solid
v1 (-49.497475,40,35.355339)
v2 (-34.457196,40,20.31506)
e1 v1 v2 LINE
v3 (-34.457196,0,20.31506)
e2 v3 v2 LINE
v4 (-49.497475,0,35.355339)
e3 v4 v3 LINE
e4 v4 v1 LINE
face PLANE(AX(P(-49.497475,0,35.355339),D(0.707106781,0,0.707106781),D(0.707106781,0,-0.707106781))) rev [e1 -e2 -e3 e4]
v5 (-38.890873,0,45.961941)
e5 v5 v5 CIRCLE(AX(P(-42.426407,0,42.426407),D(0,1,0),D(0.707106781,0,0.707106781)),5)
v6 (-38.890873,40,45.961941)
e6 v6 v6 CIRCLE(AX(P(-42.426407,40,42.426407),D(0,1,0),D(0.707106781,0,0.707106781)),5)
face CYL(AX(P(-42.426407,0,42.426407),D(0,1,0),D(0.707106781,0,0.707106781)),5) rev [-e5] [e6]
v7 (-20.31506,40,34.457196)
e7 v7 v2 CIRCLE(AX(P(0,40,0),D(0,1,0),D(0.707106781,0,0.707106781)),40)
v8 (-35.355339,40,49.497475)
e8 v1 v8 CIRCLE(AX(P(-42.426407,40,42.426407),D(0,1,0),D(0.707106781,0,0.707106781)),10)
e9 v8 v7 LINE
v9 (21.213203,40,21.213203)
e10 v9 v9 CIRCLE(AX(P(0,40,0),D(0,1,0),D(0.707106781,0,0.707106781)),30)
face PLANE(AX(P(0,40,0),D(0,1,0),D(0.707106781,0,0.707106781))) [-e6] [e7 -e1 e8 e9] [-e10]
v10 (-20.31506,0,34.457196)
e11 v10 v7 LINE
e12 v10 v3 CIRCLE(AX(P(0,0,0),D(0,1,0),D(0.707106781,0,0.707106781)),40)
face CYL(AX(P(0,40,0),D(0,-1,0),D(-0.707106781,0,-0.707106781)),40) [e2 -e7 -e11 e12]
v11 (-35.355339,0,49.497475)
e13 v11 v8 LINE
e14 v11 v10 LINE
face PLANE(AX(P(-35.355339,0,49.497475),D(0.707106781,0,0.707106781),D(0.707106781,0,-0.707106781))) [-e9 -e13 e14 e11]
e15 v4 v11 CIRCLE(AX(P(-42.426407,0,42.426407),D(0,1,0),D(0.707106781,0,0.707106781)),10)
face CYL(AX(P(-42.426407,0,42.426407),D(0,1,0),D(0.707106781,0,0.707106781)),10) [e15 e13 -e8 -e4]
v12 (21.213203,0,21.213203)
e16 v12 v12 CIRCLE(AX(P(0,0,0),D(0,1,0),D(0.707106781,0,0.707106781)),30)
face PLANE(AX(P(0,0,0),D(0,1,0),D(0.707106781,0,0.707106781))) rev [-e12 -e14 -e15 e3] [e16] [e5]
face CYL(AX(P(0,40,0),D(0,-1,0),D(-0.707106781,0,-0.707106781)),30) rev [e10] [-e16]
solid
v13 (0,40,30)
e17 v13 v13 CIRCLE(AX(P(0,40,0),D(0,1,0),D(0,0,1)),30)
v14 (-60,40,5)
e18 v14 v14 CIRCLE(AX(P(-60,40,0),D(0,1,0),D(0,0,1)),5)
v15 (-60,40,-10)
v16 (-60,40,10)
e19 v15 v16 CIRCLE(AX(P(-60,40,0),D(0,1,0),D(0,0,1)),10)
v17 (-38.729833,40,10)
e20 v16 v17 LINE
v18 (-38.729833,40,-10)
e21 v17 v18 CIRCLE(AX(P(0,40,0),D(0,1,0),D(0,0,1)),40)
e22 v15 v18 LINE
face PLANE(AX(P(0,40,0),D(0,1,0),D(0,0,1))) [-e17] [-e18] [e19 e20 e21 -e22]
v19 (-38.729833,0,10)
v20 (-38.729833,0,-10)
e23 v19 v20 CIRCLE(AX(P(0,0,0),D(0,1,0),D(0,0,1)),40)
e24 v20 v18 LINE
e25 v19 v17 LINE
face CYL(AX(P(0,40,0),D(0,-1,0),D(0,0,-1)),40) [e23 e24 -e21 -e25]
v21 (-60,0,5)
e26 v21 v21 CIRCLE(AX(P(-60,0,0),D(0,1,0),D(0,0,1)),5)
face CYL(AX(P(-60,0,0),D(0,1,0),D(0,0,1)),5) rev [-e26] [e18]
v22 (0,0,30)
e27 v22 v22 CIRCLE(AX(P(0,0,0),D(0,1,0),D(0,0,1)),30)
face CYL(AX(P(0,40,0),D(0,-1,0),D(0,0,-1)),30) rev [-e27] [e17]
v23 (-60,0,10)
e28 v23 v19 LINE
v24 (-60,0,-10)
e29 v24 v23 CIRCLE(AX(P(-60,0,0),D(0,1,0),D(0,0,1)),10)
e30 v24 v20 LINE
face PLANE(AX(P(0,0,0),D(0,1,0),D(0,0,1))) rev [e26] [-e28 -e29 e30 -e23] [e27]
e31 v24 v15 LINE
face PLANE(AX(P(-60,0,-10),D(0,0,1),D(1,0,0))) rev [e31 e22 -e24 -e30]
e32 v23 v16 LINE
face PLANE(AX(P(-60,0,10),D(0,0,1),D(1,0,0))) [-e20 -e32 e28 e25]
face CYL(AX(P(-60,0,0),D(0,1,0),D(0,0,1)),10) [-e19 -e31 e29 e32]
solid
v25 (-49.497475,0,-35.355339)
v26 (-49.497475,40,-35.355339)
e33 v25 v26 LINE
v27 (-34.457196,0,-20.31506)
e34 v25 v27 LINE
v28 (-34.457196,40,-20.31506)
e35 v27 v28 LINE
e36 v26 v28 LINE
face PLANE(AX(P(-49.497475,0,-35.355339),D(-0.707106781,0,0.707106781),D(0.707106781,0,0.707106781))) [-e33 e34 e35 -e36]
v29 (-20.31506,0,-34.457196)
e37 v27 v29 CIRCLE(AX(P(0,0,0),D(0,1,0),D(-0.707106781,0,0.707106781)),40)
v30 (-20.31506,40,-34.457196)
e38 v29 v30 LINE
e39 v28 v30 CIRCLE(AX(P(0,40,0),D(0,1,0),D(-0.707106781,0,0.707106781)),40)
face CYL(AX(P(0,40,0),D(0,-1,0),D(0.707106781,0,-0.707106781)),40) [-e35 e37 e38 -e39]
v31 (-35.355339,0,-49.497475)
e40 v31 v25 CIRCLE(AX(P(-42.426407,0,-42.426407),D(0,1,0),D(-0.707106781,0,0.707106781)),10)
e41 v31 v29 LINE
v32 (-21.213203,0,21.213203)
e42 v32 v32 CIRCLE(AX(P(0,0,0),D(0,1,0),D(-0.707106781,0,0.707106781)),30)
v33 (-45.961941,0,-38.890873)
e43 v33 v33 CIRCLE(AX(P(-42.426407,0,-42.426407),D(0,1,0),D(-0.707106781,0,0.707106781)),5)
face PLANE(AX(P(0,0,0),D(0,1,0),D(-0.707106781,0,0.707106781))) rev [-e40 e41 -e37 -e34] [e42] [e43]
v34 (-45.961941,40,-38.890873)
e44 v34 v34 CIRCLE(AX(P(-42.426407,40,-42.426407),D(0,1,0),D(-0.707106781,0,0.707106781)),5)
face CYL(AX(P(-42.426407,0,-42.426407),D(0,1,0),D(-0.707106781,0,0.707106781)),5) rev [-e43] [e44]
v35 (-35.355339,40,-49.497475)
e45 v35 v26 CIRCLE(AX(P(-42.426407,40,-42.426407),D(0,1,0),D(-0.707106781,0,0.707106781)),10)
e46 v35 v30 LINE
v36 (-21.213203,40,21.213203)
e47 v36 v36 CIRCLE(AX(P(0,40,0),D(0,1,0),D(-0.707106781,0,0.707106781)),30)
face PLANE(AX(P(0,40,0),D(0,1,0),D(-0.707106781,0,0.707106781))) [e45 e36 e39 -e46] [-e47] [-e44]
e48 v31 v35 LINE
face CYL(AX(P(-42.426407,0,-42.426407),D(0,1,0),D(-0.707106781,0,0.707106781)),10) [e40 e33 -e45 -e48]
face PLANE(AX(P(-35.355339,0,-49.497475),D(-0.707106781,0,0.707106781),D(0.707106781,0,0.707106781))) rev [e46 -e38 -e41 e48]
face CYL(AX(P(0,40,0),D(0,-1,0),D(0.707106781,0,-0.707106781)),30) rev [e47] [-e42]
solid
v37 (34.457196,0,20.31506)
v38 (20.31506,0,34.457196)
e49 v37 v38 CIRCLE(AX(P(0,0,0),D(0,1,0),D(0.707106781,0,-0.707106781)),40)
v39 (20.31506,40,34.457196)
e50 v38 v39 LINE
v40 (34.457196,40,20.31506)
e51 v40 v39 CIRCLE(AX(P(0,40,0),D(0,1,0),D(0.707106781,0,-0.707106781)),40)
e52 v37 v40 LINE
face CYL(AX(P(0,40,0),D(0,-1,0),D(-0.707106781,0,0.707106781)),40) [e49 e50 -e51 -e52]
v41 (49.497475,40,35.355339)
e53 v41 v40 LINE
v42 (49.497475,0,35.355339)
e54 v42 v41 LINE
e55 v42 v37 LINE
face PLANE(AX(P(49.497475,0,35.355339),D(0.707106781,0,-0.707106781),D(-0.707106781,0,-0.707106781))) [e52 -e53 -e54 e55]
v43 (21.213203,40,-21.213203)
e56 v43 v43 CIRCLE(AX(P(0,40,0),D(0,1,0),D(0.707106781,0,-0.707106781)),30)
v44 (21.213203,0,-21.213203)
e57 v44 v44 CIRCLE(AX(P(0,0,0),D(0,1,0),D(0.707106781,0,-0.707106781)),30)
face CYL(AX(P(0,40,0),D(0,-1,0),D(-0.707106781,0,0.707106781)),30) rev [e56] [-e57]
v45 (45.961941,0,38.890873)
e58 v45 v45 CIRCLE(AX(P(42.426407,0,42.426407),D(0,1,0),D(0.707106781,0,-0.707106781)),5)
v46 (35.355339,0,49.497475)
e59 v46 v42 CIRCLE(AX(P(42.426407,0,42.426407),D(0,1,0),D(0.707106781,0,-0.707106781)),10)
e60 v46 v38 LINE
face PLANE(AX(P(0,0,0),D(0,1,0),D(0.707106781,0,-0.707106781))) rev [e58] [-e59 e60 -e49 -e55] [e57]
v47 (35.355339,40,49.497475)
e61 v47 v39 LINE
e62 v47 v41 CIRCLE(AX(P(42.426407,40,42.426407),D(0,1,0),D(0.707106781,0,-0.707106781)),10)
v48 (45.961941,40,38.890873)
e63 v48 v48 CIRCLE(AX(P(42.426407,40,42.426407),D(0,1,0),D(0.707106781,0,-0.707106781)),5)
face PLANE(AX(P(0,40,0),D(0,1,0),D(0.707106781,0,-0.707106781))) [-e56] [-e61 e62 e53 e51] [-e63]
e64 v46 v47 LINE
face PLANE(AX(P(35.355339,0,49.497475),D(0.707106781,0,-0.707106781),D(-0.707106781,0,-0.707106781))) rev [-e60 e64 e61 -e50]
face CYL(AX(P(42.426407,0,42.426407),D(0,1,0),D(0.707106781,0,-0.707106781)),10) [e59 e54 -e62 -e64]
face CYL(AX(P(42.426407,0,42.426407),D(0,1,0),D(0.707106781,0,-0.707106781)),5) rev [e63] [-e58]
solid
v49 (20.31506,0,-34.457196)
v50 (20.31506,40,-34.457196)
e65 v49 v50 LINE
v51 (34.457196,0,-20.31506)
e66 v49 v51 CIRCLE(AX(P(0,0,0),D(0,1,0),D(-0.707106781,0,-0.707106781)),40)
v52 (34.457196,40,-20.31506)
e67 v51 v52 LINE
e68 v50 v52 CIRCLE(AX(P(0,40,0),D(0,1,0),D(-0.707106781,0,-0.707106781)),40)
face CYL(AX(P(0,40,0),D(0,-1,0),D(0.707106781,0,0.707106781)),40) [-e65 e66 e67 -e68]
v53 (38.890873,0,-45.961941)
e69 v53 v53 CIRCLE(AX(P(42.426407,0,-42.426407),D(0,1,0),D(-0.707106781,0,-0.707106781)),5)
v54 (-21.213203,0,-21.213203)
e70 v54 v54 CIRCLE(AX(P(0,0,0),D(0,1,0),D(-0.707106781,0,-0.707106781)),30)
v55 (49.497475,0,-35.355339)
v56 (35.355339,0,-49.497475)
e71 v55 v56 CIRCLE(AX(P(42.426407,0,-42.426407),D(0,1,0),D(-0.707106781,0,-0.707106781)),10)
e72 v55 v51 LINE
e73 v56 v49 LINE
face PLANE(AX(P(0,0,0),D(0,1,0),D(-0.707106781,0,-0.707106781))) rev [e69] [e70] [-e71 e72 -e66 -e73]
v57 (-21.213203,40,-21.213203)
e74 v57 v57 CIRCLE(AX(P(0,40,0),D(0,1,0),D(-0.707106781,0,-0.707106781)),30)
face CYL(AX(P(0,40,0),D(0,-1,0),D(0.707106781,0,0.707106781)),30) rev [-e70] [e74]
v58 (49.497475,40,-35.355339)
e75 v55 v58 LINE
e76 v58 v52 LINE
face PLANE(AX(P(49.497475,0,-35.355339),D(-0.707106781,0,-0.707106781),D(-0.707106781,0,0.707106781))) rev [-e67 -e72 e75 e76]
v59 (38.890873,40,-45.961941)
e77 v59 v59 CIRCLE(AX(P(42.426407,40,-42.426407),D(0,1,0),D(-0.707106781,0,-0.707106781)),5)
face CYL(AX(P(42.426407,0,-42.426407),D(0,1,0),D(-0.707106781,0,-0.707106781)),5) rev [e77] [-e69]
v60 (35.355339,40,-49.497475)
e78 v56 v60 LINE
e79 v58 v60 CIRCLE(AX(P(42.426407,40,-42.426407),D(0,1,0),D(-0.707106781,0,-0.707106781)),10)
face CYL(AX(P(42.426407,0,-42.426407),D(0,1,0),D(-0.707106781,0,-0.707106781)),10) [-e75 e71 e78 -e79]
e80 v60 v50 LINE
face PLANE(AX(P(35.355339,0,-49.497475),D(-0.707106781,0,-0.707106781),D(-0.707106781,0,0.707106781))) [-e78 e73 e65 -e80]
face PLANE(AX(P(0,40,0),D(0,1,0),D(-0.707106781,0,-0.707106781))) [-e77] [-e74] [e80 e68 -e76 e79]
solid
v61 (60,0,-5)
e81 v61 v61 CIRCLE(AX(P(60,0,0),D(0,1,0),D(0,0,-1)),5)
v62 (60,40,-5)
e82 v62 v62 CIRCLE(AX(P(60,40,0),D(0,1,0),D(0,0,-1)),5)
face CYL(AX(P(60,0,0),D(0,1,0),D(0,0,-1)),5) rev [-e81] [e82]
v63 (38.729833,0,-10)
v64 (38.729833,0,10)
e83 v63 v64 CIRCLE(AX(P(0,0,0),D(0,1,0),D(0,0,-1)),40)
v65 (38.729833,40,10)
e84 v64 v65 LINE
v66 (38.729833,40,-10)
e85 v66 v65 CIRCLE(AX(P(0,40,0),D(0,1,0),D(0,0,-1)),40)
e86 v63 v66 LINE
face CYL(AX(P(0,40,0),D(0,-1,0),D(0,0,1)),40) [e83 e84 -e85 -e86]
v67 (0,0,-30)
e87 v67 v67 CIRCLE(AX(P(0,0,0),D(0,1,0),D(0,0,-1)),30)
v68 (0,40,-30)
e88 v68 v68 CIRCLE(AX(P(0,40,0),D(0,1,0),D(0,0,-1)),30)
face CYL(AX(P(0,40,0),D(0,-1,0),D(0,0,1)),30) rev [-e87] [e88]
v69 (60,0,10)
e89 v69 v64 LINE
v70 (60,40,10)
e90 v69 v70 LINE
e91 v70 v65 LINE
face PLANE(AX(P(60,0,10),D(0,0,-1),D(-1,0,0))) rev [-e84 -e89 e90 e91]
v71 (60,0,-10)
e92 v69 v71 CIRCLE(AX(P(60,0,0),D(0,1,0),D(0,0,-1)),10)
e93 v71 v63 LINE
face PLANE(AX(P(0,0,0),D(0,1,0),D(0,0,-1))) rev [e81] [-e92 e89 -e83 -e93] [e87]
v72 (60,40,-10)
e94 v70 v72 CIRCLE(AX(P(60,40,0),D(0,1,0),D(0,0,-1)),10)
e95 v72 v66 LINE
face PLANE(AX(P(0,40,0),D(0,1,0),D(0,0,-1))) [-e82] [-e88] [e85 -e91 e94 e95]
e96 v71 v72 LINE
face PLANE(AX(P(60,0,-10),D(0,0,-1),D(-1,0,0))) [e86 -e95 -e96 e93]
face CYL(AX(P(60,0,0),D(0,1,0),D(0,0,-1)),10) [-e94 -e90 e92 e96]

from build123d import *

# Parameters (mm, degrees)
SKETCH1_R                  = 40
SKETCH1_R_2                = 30
BOSS_EXTRUDE1_DEPTH        = 40
SKETCH2_R                  = 10
SKETCH2_R_2                = 5
BOSS_EXTRUDE2_DEPTH        = 40
BOSS_EXTRUDE3_DEPTH        = 40
BOSS_EXTRUDE10_DEPTH       = 40
CIRPATTERN13_OUTLINE_R     = 5
CIRPATTERN13_OUTLINE_R_2   = 30
CIRPATTERN13_DEPTH         = 40
CIRPATTERN13_2_OUTLINE_R   = 5
CIRPATTERN13_2_OUTLINE_R_2 = 30
CIRPATTERN13_2_DEPTH       = 40
CIRPATTERN13_3_OUTLINE_R   = 30
CIRPATTERN13_3_OUTLINE_R_2 = 5
CIRPATTERN13_3_DEPTH       = 40
CIRPATTERN13_4_OUTLINE_R   = 30
CIRPATTERN13_4_OUTLINE_R_2 = 5
CIRPATTERN13_4_DEPTH       = 40
CIRPATTERN13_5_OUTLINE_R   = 30
CIRPATTERN13_5_OUTLINE_R_2 = 5
CIRPATTERN13_5_DEPTH       = 40


# Read off the part's stored shape, not the designer's step: CirPattern13
with BuildPart() as part:
    # Sketch1 → Boss-Extrude1 (new body)
    with BuildSketch(Plane(origin=(0, 0, 0), x_dir=(1, 0, 0), z_dir=(0, 1, 0))):
        with Locations(Location((0, 0, 0), (0, 0, 270))):
            Circle(SKETCH1_R)
        with Locations(Location((0, 0, 0), (0, 0, 270))):
            Circle(SKETCH1_R_2, mode=Mode.SUBTRACT)
    extrude(amount=BOSS_EXTRUDE1_DEPTH)



with BuildPart() as body_2:
    # Sketch2 → Boss-Extrude2 (new body)
    with BuildSketch(Plane(origin=(0, 40, 0), x_dir=(1, 0, 0), z_dir=(0, 1, 0))):
        with Locations(Location((-60, 0, 0), (0, 0, 270))):
            Circle(SKETCH2_R)
        with Locations(Location((-60, 0, 0), (0, 0, 270))):
            Circle(SKETCH2_R_2, mode=Mode.SUBTRACT)
    extrude(amount=-BOSS_EXTRUDE2_DEPTH)


with BuildPart() as part_1:
    add(part.part)

    add(body_2.part)  # Boss-Extrude3 merges body 2
    # Sketch3 → Boss-Extrude3 (add)
    with BuildSketch(Plane(origin=(0, 40, 0), x_dir=(1, 0, 0), z_dir=(0, 1, 0))):
        Polygon((-60, 10), (-38.729833462, 10), (-38.729833462, -10), align=None)
    extrude(amount=-BOSS_EXTRUDE3_DEPTH)

    # Sketch4 → Boss-Extrude10 (add)
    with BuildSketch(Plane(origin=(0, 40, 0), x_dir=(1, 0, 0), z_dir=(0, 1, 0))):
        Polygon((-60, -10), (-38.729833462, -10), (-48.078623612, 10), align=None)
    extrude(amount=-BOSS_EXTRUDE10_DEPTH)


with BuildPart() as body_2_2:
    # CirPattern13 outline → CirPattern13 (new body)
    with BuildSketch(Plane(origin=(0, 0, 0), x_dir=(1, 0, 0), z_dir=(0, 1, 0))):
        with BuildLine():
            ThreePointArc((-20.315060063, -34.457195687), (28.284271247, 28.284271247), (-34.457195687, -20.315060063))
            Line((-34.457195687, -20.315060063), (-49.497474683, -35.355339059))
            ThreePointArc((-49.497474683, -35.355339059), (-49.497474683, -49.497474683), (-35.355339059, -49.497474683))
            Line((-35.355339059, -49.497474683), (-20.315060063, -34.457195687))
        make_face()
        with Locations((-42.426406871, -42.426406871)):
            Circle(CIRPATTERN13_OUTLINE_R, mode=Mode.SUBTRACT)
        Circle(CIRPATTERN13_OUTLINE_R_2, mode=Mode.SUBTRACT)
    extrude(amount=CIRPATTERN13_DEPTH)


with BuildPart() as body_3:
    # CirPattern13 2 outline → CirPattern13 2 (new body)
    with BuildSketch(Plane(origin=(0, 0, 0), x_dir=(1, 0, 0), z_dir=(0, 1, 0))):
        with BuildLine():
            ThreePointArc((34.457195687, -20.315060063), (-28.284271247, 28.284271247), (20.315060063, -34.457195687))
            Line((20.315060063, -34.457195687), (35.355339059, -49.497474683))
            ThreePointArc((35.355339059, -49.497474683), (49.497474683, -49.497474683), (49.497474683, -35.355339059))
            Line((49.497474683, -35.355339059), (34.457195687, -20.315060063))
        make_face()
        with Locations((42.426406871, -42.426406871)):
            Circle(CIRPATTERN13_2_OUTLINE_R, mode=Mode.SUBTRACT)
        Circle(CIRPATTERN13_2_OUTLINE_R_2, mode=Mode.SUBTRACT)
    extrude(amount=CIRPATTERN13_2_DEPTH)


with BuildPart() as body_4:
    # CirPattern13 3 outline → CirPattern13 3 (new body)
    with BuildSketch(Plane(origin=(0, 0, 0), x_dir=(1, 0, 0), z_dir=(0, 1, 0))):
        with BuildLine():
            ThreePointArc((38.729833462, 10), (-40, 0), (38.729833462, -10))
            Line((38.729833462, -10), (60, -10))
            ThreePointArc((60, -10), (70, 0), (60, 10))
            Line((60, 10), (38.729833462, 10))
        make_face()
        Circle(CIRPATTERN13_3_OUTLINE_R, mode=Mode.SUBTRACT)
        with Locations((60, 0)):
            Circle(CIRPATTERN13_3_OUTLINE_R_2, mode=Mode.SUBTRACT)
    extrude(amount=CIRPATTERN13_3_DEPTH)


with BuildPart() as body_5:
    # CirPattern13 4 outline → CirPattern13 4 (new body)
    with BuildSketch(Plane(origin=(0, 0, 0), x_dir=(1, 0, 0), z_dir=(0, 1, 0))):
        with BuildLine():
            ThreePointArc((20.315060063, 34.457195687), (-28.284271247, -28.284271247), (34.457195687, 20.315060063))
            Line((34.457195687, 20.315060063), (49.497474683, 35.355339059))
            ThreePointArc((49.497474683, 35.355339059), (49.497474683, 49.497474683), (35.355339059, 49.497474683))
            Line((35.355339059, 49.497474683), (20.315060063, 34.457195687))
        make_face()
        Circle(CIRPATTERN13_4_OUTLINE_R, mode=Mode.SUBTRACT)
        with Locations((42.426406871, 42.426406871)):
            Circle(CIRPATTERN13_4_OUTLINE_R_2, mode=Mode.SUBTRACT)
    extrude(amount=CIRPATTERN13_4_DEPTH)


with BuildPart() as body_6:
    # CirPattern13 5 outline → CirPattern13 5 (new body)
    with BuildSketch(Plane(origin=(0, 0, 0), x_dir=(1, 0, 0), z_dir=(0, 1, 0))):
        with BuildLine():
            ThreePointArc((-34.457195687, 20.315060063), (28.284271247, -28.284271247), (-20.315060063, 34.457195687))
            Line((-20.315060063, 34.457195687), (-35.355339059, 49.497474683))
            ThreePointArc((-35.355339059, 49.497474683), (-49.497474683, 49.497474683), (-49.497474683, 35.355339059))
            Line((-49.497474683, 35.355339059), (-34.457195687, 20.315060063))
        make_face()
        Circle(CIRPATTERN13_5_OUTLINE_R, mode=Mode.SUBTRACT)
        with Locations((-42.426406871, 42.426406871)):
            Circle(CIRPATTERN13_5_OUTLINE_R_2, mode=Mode.SUBTRACT)
    extrude(amount=CIRPATTERN13_5_DEPTH)


solid = Compound([part_1.part, body_2_2.part, body_3.part, body_4.part, body_5.part, body_6.part])
